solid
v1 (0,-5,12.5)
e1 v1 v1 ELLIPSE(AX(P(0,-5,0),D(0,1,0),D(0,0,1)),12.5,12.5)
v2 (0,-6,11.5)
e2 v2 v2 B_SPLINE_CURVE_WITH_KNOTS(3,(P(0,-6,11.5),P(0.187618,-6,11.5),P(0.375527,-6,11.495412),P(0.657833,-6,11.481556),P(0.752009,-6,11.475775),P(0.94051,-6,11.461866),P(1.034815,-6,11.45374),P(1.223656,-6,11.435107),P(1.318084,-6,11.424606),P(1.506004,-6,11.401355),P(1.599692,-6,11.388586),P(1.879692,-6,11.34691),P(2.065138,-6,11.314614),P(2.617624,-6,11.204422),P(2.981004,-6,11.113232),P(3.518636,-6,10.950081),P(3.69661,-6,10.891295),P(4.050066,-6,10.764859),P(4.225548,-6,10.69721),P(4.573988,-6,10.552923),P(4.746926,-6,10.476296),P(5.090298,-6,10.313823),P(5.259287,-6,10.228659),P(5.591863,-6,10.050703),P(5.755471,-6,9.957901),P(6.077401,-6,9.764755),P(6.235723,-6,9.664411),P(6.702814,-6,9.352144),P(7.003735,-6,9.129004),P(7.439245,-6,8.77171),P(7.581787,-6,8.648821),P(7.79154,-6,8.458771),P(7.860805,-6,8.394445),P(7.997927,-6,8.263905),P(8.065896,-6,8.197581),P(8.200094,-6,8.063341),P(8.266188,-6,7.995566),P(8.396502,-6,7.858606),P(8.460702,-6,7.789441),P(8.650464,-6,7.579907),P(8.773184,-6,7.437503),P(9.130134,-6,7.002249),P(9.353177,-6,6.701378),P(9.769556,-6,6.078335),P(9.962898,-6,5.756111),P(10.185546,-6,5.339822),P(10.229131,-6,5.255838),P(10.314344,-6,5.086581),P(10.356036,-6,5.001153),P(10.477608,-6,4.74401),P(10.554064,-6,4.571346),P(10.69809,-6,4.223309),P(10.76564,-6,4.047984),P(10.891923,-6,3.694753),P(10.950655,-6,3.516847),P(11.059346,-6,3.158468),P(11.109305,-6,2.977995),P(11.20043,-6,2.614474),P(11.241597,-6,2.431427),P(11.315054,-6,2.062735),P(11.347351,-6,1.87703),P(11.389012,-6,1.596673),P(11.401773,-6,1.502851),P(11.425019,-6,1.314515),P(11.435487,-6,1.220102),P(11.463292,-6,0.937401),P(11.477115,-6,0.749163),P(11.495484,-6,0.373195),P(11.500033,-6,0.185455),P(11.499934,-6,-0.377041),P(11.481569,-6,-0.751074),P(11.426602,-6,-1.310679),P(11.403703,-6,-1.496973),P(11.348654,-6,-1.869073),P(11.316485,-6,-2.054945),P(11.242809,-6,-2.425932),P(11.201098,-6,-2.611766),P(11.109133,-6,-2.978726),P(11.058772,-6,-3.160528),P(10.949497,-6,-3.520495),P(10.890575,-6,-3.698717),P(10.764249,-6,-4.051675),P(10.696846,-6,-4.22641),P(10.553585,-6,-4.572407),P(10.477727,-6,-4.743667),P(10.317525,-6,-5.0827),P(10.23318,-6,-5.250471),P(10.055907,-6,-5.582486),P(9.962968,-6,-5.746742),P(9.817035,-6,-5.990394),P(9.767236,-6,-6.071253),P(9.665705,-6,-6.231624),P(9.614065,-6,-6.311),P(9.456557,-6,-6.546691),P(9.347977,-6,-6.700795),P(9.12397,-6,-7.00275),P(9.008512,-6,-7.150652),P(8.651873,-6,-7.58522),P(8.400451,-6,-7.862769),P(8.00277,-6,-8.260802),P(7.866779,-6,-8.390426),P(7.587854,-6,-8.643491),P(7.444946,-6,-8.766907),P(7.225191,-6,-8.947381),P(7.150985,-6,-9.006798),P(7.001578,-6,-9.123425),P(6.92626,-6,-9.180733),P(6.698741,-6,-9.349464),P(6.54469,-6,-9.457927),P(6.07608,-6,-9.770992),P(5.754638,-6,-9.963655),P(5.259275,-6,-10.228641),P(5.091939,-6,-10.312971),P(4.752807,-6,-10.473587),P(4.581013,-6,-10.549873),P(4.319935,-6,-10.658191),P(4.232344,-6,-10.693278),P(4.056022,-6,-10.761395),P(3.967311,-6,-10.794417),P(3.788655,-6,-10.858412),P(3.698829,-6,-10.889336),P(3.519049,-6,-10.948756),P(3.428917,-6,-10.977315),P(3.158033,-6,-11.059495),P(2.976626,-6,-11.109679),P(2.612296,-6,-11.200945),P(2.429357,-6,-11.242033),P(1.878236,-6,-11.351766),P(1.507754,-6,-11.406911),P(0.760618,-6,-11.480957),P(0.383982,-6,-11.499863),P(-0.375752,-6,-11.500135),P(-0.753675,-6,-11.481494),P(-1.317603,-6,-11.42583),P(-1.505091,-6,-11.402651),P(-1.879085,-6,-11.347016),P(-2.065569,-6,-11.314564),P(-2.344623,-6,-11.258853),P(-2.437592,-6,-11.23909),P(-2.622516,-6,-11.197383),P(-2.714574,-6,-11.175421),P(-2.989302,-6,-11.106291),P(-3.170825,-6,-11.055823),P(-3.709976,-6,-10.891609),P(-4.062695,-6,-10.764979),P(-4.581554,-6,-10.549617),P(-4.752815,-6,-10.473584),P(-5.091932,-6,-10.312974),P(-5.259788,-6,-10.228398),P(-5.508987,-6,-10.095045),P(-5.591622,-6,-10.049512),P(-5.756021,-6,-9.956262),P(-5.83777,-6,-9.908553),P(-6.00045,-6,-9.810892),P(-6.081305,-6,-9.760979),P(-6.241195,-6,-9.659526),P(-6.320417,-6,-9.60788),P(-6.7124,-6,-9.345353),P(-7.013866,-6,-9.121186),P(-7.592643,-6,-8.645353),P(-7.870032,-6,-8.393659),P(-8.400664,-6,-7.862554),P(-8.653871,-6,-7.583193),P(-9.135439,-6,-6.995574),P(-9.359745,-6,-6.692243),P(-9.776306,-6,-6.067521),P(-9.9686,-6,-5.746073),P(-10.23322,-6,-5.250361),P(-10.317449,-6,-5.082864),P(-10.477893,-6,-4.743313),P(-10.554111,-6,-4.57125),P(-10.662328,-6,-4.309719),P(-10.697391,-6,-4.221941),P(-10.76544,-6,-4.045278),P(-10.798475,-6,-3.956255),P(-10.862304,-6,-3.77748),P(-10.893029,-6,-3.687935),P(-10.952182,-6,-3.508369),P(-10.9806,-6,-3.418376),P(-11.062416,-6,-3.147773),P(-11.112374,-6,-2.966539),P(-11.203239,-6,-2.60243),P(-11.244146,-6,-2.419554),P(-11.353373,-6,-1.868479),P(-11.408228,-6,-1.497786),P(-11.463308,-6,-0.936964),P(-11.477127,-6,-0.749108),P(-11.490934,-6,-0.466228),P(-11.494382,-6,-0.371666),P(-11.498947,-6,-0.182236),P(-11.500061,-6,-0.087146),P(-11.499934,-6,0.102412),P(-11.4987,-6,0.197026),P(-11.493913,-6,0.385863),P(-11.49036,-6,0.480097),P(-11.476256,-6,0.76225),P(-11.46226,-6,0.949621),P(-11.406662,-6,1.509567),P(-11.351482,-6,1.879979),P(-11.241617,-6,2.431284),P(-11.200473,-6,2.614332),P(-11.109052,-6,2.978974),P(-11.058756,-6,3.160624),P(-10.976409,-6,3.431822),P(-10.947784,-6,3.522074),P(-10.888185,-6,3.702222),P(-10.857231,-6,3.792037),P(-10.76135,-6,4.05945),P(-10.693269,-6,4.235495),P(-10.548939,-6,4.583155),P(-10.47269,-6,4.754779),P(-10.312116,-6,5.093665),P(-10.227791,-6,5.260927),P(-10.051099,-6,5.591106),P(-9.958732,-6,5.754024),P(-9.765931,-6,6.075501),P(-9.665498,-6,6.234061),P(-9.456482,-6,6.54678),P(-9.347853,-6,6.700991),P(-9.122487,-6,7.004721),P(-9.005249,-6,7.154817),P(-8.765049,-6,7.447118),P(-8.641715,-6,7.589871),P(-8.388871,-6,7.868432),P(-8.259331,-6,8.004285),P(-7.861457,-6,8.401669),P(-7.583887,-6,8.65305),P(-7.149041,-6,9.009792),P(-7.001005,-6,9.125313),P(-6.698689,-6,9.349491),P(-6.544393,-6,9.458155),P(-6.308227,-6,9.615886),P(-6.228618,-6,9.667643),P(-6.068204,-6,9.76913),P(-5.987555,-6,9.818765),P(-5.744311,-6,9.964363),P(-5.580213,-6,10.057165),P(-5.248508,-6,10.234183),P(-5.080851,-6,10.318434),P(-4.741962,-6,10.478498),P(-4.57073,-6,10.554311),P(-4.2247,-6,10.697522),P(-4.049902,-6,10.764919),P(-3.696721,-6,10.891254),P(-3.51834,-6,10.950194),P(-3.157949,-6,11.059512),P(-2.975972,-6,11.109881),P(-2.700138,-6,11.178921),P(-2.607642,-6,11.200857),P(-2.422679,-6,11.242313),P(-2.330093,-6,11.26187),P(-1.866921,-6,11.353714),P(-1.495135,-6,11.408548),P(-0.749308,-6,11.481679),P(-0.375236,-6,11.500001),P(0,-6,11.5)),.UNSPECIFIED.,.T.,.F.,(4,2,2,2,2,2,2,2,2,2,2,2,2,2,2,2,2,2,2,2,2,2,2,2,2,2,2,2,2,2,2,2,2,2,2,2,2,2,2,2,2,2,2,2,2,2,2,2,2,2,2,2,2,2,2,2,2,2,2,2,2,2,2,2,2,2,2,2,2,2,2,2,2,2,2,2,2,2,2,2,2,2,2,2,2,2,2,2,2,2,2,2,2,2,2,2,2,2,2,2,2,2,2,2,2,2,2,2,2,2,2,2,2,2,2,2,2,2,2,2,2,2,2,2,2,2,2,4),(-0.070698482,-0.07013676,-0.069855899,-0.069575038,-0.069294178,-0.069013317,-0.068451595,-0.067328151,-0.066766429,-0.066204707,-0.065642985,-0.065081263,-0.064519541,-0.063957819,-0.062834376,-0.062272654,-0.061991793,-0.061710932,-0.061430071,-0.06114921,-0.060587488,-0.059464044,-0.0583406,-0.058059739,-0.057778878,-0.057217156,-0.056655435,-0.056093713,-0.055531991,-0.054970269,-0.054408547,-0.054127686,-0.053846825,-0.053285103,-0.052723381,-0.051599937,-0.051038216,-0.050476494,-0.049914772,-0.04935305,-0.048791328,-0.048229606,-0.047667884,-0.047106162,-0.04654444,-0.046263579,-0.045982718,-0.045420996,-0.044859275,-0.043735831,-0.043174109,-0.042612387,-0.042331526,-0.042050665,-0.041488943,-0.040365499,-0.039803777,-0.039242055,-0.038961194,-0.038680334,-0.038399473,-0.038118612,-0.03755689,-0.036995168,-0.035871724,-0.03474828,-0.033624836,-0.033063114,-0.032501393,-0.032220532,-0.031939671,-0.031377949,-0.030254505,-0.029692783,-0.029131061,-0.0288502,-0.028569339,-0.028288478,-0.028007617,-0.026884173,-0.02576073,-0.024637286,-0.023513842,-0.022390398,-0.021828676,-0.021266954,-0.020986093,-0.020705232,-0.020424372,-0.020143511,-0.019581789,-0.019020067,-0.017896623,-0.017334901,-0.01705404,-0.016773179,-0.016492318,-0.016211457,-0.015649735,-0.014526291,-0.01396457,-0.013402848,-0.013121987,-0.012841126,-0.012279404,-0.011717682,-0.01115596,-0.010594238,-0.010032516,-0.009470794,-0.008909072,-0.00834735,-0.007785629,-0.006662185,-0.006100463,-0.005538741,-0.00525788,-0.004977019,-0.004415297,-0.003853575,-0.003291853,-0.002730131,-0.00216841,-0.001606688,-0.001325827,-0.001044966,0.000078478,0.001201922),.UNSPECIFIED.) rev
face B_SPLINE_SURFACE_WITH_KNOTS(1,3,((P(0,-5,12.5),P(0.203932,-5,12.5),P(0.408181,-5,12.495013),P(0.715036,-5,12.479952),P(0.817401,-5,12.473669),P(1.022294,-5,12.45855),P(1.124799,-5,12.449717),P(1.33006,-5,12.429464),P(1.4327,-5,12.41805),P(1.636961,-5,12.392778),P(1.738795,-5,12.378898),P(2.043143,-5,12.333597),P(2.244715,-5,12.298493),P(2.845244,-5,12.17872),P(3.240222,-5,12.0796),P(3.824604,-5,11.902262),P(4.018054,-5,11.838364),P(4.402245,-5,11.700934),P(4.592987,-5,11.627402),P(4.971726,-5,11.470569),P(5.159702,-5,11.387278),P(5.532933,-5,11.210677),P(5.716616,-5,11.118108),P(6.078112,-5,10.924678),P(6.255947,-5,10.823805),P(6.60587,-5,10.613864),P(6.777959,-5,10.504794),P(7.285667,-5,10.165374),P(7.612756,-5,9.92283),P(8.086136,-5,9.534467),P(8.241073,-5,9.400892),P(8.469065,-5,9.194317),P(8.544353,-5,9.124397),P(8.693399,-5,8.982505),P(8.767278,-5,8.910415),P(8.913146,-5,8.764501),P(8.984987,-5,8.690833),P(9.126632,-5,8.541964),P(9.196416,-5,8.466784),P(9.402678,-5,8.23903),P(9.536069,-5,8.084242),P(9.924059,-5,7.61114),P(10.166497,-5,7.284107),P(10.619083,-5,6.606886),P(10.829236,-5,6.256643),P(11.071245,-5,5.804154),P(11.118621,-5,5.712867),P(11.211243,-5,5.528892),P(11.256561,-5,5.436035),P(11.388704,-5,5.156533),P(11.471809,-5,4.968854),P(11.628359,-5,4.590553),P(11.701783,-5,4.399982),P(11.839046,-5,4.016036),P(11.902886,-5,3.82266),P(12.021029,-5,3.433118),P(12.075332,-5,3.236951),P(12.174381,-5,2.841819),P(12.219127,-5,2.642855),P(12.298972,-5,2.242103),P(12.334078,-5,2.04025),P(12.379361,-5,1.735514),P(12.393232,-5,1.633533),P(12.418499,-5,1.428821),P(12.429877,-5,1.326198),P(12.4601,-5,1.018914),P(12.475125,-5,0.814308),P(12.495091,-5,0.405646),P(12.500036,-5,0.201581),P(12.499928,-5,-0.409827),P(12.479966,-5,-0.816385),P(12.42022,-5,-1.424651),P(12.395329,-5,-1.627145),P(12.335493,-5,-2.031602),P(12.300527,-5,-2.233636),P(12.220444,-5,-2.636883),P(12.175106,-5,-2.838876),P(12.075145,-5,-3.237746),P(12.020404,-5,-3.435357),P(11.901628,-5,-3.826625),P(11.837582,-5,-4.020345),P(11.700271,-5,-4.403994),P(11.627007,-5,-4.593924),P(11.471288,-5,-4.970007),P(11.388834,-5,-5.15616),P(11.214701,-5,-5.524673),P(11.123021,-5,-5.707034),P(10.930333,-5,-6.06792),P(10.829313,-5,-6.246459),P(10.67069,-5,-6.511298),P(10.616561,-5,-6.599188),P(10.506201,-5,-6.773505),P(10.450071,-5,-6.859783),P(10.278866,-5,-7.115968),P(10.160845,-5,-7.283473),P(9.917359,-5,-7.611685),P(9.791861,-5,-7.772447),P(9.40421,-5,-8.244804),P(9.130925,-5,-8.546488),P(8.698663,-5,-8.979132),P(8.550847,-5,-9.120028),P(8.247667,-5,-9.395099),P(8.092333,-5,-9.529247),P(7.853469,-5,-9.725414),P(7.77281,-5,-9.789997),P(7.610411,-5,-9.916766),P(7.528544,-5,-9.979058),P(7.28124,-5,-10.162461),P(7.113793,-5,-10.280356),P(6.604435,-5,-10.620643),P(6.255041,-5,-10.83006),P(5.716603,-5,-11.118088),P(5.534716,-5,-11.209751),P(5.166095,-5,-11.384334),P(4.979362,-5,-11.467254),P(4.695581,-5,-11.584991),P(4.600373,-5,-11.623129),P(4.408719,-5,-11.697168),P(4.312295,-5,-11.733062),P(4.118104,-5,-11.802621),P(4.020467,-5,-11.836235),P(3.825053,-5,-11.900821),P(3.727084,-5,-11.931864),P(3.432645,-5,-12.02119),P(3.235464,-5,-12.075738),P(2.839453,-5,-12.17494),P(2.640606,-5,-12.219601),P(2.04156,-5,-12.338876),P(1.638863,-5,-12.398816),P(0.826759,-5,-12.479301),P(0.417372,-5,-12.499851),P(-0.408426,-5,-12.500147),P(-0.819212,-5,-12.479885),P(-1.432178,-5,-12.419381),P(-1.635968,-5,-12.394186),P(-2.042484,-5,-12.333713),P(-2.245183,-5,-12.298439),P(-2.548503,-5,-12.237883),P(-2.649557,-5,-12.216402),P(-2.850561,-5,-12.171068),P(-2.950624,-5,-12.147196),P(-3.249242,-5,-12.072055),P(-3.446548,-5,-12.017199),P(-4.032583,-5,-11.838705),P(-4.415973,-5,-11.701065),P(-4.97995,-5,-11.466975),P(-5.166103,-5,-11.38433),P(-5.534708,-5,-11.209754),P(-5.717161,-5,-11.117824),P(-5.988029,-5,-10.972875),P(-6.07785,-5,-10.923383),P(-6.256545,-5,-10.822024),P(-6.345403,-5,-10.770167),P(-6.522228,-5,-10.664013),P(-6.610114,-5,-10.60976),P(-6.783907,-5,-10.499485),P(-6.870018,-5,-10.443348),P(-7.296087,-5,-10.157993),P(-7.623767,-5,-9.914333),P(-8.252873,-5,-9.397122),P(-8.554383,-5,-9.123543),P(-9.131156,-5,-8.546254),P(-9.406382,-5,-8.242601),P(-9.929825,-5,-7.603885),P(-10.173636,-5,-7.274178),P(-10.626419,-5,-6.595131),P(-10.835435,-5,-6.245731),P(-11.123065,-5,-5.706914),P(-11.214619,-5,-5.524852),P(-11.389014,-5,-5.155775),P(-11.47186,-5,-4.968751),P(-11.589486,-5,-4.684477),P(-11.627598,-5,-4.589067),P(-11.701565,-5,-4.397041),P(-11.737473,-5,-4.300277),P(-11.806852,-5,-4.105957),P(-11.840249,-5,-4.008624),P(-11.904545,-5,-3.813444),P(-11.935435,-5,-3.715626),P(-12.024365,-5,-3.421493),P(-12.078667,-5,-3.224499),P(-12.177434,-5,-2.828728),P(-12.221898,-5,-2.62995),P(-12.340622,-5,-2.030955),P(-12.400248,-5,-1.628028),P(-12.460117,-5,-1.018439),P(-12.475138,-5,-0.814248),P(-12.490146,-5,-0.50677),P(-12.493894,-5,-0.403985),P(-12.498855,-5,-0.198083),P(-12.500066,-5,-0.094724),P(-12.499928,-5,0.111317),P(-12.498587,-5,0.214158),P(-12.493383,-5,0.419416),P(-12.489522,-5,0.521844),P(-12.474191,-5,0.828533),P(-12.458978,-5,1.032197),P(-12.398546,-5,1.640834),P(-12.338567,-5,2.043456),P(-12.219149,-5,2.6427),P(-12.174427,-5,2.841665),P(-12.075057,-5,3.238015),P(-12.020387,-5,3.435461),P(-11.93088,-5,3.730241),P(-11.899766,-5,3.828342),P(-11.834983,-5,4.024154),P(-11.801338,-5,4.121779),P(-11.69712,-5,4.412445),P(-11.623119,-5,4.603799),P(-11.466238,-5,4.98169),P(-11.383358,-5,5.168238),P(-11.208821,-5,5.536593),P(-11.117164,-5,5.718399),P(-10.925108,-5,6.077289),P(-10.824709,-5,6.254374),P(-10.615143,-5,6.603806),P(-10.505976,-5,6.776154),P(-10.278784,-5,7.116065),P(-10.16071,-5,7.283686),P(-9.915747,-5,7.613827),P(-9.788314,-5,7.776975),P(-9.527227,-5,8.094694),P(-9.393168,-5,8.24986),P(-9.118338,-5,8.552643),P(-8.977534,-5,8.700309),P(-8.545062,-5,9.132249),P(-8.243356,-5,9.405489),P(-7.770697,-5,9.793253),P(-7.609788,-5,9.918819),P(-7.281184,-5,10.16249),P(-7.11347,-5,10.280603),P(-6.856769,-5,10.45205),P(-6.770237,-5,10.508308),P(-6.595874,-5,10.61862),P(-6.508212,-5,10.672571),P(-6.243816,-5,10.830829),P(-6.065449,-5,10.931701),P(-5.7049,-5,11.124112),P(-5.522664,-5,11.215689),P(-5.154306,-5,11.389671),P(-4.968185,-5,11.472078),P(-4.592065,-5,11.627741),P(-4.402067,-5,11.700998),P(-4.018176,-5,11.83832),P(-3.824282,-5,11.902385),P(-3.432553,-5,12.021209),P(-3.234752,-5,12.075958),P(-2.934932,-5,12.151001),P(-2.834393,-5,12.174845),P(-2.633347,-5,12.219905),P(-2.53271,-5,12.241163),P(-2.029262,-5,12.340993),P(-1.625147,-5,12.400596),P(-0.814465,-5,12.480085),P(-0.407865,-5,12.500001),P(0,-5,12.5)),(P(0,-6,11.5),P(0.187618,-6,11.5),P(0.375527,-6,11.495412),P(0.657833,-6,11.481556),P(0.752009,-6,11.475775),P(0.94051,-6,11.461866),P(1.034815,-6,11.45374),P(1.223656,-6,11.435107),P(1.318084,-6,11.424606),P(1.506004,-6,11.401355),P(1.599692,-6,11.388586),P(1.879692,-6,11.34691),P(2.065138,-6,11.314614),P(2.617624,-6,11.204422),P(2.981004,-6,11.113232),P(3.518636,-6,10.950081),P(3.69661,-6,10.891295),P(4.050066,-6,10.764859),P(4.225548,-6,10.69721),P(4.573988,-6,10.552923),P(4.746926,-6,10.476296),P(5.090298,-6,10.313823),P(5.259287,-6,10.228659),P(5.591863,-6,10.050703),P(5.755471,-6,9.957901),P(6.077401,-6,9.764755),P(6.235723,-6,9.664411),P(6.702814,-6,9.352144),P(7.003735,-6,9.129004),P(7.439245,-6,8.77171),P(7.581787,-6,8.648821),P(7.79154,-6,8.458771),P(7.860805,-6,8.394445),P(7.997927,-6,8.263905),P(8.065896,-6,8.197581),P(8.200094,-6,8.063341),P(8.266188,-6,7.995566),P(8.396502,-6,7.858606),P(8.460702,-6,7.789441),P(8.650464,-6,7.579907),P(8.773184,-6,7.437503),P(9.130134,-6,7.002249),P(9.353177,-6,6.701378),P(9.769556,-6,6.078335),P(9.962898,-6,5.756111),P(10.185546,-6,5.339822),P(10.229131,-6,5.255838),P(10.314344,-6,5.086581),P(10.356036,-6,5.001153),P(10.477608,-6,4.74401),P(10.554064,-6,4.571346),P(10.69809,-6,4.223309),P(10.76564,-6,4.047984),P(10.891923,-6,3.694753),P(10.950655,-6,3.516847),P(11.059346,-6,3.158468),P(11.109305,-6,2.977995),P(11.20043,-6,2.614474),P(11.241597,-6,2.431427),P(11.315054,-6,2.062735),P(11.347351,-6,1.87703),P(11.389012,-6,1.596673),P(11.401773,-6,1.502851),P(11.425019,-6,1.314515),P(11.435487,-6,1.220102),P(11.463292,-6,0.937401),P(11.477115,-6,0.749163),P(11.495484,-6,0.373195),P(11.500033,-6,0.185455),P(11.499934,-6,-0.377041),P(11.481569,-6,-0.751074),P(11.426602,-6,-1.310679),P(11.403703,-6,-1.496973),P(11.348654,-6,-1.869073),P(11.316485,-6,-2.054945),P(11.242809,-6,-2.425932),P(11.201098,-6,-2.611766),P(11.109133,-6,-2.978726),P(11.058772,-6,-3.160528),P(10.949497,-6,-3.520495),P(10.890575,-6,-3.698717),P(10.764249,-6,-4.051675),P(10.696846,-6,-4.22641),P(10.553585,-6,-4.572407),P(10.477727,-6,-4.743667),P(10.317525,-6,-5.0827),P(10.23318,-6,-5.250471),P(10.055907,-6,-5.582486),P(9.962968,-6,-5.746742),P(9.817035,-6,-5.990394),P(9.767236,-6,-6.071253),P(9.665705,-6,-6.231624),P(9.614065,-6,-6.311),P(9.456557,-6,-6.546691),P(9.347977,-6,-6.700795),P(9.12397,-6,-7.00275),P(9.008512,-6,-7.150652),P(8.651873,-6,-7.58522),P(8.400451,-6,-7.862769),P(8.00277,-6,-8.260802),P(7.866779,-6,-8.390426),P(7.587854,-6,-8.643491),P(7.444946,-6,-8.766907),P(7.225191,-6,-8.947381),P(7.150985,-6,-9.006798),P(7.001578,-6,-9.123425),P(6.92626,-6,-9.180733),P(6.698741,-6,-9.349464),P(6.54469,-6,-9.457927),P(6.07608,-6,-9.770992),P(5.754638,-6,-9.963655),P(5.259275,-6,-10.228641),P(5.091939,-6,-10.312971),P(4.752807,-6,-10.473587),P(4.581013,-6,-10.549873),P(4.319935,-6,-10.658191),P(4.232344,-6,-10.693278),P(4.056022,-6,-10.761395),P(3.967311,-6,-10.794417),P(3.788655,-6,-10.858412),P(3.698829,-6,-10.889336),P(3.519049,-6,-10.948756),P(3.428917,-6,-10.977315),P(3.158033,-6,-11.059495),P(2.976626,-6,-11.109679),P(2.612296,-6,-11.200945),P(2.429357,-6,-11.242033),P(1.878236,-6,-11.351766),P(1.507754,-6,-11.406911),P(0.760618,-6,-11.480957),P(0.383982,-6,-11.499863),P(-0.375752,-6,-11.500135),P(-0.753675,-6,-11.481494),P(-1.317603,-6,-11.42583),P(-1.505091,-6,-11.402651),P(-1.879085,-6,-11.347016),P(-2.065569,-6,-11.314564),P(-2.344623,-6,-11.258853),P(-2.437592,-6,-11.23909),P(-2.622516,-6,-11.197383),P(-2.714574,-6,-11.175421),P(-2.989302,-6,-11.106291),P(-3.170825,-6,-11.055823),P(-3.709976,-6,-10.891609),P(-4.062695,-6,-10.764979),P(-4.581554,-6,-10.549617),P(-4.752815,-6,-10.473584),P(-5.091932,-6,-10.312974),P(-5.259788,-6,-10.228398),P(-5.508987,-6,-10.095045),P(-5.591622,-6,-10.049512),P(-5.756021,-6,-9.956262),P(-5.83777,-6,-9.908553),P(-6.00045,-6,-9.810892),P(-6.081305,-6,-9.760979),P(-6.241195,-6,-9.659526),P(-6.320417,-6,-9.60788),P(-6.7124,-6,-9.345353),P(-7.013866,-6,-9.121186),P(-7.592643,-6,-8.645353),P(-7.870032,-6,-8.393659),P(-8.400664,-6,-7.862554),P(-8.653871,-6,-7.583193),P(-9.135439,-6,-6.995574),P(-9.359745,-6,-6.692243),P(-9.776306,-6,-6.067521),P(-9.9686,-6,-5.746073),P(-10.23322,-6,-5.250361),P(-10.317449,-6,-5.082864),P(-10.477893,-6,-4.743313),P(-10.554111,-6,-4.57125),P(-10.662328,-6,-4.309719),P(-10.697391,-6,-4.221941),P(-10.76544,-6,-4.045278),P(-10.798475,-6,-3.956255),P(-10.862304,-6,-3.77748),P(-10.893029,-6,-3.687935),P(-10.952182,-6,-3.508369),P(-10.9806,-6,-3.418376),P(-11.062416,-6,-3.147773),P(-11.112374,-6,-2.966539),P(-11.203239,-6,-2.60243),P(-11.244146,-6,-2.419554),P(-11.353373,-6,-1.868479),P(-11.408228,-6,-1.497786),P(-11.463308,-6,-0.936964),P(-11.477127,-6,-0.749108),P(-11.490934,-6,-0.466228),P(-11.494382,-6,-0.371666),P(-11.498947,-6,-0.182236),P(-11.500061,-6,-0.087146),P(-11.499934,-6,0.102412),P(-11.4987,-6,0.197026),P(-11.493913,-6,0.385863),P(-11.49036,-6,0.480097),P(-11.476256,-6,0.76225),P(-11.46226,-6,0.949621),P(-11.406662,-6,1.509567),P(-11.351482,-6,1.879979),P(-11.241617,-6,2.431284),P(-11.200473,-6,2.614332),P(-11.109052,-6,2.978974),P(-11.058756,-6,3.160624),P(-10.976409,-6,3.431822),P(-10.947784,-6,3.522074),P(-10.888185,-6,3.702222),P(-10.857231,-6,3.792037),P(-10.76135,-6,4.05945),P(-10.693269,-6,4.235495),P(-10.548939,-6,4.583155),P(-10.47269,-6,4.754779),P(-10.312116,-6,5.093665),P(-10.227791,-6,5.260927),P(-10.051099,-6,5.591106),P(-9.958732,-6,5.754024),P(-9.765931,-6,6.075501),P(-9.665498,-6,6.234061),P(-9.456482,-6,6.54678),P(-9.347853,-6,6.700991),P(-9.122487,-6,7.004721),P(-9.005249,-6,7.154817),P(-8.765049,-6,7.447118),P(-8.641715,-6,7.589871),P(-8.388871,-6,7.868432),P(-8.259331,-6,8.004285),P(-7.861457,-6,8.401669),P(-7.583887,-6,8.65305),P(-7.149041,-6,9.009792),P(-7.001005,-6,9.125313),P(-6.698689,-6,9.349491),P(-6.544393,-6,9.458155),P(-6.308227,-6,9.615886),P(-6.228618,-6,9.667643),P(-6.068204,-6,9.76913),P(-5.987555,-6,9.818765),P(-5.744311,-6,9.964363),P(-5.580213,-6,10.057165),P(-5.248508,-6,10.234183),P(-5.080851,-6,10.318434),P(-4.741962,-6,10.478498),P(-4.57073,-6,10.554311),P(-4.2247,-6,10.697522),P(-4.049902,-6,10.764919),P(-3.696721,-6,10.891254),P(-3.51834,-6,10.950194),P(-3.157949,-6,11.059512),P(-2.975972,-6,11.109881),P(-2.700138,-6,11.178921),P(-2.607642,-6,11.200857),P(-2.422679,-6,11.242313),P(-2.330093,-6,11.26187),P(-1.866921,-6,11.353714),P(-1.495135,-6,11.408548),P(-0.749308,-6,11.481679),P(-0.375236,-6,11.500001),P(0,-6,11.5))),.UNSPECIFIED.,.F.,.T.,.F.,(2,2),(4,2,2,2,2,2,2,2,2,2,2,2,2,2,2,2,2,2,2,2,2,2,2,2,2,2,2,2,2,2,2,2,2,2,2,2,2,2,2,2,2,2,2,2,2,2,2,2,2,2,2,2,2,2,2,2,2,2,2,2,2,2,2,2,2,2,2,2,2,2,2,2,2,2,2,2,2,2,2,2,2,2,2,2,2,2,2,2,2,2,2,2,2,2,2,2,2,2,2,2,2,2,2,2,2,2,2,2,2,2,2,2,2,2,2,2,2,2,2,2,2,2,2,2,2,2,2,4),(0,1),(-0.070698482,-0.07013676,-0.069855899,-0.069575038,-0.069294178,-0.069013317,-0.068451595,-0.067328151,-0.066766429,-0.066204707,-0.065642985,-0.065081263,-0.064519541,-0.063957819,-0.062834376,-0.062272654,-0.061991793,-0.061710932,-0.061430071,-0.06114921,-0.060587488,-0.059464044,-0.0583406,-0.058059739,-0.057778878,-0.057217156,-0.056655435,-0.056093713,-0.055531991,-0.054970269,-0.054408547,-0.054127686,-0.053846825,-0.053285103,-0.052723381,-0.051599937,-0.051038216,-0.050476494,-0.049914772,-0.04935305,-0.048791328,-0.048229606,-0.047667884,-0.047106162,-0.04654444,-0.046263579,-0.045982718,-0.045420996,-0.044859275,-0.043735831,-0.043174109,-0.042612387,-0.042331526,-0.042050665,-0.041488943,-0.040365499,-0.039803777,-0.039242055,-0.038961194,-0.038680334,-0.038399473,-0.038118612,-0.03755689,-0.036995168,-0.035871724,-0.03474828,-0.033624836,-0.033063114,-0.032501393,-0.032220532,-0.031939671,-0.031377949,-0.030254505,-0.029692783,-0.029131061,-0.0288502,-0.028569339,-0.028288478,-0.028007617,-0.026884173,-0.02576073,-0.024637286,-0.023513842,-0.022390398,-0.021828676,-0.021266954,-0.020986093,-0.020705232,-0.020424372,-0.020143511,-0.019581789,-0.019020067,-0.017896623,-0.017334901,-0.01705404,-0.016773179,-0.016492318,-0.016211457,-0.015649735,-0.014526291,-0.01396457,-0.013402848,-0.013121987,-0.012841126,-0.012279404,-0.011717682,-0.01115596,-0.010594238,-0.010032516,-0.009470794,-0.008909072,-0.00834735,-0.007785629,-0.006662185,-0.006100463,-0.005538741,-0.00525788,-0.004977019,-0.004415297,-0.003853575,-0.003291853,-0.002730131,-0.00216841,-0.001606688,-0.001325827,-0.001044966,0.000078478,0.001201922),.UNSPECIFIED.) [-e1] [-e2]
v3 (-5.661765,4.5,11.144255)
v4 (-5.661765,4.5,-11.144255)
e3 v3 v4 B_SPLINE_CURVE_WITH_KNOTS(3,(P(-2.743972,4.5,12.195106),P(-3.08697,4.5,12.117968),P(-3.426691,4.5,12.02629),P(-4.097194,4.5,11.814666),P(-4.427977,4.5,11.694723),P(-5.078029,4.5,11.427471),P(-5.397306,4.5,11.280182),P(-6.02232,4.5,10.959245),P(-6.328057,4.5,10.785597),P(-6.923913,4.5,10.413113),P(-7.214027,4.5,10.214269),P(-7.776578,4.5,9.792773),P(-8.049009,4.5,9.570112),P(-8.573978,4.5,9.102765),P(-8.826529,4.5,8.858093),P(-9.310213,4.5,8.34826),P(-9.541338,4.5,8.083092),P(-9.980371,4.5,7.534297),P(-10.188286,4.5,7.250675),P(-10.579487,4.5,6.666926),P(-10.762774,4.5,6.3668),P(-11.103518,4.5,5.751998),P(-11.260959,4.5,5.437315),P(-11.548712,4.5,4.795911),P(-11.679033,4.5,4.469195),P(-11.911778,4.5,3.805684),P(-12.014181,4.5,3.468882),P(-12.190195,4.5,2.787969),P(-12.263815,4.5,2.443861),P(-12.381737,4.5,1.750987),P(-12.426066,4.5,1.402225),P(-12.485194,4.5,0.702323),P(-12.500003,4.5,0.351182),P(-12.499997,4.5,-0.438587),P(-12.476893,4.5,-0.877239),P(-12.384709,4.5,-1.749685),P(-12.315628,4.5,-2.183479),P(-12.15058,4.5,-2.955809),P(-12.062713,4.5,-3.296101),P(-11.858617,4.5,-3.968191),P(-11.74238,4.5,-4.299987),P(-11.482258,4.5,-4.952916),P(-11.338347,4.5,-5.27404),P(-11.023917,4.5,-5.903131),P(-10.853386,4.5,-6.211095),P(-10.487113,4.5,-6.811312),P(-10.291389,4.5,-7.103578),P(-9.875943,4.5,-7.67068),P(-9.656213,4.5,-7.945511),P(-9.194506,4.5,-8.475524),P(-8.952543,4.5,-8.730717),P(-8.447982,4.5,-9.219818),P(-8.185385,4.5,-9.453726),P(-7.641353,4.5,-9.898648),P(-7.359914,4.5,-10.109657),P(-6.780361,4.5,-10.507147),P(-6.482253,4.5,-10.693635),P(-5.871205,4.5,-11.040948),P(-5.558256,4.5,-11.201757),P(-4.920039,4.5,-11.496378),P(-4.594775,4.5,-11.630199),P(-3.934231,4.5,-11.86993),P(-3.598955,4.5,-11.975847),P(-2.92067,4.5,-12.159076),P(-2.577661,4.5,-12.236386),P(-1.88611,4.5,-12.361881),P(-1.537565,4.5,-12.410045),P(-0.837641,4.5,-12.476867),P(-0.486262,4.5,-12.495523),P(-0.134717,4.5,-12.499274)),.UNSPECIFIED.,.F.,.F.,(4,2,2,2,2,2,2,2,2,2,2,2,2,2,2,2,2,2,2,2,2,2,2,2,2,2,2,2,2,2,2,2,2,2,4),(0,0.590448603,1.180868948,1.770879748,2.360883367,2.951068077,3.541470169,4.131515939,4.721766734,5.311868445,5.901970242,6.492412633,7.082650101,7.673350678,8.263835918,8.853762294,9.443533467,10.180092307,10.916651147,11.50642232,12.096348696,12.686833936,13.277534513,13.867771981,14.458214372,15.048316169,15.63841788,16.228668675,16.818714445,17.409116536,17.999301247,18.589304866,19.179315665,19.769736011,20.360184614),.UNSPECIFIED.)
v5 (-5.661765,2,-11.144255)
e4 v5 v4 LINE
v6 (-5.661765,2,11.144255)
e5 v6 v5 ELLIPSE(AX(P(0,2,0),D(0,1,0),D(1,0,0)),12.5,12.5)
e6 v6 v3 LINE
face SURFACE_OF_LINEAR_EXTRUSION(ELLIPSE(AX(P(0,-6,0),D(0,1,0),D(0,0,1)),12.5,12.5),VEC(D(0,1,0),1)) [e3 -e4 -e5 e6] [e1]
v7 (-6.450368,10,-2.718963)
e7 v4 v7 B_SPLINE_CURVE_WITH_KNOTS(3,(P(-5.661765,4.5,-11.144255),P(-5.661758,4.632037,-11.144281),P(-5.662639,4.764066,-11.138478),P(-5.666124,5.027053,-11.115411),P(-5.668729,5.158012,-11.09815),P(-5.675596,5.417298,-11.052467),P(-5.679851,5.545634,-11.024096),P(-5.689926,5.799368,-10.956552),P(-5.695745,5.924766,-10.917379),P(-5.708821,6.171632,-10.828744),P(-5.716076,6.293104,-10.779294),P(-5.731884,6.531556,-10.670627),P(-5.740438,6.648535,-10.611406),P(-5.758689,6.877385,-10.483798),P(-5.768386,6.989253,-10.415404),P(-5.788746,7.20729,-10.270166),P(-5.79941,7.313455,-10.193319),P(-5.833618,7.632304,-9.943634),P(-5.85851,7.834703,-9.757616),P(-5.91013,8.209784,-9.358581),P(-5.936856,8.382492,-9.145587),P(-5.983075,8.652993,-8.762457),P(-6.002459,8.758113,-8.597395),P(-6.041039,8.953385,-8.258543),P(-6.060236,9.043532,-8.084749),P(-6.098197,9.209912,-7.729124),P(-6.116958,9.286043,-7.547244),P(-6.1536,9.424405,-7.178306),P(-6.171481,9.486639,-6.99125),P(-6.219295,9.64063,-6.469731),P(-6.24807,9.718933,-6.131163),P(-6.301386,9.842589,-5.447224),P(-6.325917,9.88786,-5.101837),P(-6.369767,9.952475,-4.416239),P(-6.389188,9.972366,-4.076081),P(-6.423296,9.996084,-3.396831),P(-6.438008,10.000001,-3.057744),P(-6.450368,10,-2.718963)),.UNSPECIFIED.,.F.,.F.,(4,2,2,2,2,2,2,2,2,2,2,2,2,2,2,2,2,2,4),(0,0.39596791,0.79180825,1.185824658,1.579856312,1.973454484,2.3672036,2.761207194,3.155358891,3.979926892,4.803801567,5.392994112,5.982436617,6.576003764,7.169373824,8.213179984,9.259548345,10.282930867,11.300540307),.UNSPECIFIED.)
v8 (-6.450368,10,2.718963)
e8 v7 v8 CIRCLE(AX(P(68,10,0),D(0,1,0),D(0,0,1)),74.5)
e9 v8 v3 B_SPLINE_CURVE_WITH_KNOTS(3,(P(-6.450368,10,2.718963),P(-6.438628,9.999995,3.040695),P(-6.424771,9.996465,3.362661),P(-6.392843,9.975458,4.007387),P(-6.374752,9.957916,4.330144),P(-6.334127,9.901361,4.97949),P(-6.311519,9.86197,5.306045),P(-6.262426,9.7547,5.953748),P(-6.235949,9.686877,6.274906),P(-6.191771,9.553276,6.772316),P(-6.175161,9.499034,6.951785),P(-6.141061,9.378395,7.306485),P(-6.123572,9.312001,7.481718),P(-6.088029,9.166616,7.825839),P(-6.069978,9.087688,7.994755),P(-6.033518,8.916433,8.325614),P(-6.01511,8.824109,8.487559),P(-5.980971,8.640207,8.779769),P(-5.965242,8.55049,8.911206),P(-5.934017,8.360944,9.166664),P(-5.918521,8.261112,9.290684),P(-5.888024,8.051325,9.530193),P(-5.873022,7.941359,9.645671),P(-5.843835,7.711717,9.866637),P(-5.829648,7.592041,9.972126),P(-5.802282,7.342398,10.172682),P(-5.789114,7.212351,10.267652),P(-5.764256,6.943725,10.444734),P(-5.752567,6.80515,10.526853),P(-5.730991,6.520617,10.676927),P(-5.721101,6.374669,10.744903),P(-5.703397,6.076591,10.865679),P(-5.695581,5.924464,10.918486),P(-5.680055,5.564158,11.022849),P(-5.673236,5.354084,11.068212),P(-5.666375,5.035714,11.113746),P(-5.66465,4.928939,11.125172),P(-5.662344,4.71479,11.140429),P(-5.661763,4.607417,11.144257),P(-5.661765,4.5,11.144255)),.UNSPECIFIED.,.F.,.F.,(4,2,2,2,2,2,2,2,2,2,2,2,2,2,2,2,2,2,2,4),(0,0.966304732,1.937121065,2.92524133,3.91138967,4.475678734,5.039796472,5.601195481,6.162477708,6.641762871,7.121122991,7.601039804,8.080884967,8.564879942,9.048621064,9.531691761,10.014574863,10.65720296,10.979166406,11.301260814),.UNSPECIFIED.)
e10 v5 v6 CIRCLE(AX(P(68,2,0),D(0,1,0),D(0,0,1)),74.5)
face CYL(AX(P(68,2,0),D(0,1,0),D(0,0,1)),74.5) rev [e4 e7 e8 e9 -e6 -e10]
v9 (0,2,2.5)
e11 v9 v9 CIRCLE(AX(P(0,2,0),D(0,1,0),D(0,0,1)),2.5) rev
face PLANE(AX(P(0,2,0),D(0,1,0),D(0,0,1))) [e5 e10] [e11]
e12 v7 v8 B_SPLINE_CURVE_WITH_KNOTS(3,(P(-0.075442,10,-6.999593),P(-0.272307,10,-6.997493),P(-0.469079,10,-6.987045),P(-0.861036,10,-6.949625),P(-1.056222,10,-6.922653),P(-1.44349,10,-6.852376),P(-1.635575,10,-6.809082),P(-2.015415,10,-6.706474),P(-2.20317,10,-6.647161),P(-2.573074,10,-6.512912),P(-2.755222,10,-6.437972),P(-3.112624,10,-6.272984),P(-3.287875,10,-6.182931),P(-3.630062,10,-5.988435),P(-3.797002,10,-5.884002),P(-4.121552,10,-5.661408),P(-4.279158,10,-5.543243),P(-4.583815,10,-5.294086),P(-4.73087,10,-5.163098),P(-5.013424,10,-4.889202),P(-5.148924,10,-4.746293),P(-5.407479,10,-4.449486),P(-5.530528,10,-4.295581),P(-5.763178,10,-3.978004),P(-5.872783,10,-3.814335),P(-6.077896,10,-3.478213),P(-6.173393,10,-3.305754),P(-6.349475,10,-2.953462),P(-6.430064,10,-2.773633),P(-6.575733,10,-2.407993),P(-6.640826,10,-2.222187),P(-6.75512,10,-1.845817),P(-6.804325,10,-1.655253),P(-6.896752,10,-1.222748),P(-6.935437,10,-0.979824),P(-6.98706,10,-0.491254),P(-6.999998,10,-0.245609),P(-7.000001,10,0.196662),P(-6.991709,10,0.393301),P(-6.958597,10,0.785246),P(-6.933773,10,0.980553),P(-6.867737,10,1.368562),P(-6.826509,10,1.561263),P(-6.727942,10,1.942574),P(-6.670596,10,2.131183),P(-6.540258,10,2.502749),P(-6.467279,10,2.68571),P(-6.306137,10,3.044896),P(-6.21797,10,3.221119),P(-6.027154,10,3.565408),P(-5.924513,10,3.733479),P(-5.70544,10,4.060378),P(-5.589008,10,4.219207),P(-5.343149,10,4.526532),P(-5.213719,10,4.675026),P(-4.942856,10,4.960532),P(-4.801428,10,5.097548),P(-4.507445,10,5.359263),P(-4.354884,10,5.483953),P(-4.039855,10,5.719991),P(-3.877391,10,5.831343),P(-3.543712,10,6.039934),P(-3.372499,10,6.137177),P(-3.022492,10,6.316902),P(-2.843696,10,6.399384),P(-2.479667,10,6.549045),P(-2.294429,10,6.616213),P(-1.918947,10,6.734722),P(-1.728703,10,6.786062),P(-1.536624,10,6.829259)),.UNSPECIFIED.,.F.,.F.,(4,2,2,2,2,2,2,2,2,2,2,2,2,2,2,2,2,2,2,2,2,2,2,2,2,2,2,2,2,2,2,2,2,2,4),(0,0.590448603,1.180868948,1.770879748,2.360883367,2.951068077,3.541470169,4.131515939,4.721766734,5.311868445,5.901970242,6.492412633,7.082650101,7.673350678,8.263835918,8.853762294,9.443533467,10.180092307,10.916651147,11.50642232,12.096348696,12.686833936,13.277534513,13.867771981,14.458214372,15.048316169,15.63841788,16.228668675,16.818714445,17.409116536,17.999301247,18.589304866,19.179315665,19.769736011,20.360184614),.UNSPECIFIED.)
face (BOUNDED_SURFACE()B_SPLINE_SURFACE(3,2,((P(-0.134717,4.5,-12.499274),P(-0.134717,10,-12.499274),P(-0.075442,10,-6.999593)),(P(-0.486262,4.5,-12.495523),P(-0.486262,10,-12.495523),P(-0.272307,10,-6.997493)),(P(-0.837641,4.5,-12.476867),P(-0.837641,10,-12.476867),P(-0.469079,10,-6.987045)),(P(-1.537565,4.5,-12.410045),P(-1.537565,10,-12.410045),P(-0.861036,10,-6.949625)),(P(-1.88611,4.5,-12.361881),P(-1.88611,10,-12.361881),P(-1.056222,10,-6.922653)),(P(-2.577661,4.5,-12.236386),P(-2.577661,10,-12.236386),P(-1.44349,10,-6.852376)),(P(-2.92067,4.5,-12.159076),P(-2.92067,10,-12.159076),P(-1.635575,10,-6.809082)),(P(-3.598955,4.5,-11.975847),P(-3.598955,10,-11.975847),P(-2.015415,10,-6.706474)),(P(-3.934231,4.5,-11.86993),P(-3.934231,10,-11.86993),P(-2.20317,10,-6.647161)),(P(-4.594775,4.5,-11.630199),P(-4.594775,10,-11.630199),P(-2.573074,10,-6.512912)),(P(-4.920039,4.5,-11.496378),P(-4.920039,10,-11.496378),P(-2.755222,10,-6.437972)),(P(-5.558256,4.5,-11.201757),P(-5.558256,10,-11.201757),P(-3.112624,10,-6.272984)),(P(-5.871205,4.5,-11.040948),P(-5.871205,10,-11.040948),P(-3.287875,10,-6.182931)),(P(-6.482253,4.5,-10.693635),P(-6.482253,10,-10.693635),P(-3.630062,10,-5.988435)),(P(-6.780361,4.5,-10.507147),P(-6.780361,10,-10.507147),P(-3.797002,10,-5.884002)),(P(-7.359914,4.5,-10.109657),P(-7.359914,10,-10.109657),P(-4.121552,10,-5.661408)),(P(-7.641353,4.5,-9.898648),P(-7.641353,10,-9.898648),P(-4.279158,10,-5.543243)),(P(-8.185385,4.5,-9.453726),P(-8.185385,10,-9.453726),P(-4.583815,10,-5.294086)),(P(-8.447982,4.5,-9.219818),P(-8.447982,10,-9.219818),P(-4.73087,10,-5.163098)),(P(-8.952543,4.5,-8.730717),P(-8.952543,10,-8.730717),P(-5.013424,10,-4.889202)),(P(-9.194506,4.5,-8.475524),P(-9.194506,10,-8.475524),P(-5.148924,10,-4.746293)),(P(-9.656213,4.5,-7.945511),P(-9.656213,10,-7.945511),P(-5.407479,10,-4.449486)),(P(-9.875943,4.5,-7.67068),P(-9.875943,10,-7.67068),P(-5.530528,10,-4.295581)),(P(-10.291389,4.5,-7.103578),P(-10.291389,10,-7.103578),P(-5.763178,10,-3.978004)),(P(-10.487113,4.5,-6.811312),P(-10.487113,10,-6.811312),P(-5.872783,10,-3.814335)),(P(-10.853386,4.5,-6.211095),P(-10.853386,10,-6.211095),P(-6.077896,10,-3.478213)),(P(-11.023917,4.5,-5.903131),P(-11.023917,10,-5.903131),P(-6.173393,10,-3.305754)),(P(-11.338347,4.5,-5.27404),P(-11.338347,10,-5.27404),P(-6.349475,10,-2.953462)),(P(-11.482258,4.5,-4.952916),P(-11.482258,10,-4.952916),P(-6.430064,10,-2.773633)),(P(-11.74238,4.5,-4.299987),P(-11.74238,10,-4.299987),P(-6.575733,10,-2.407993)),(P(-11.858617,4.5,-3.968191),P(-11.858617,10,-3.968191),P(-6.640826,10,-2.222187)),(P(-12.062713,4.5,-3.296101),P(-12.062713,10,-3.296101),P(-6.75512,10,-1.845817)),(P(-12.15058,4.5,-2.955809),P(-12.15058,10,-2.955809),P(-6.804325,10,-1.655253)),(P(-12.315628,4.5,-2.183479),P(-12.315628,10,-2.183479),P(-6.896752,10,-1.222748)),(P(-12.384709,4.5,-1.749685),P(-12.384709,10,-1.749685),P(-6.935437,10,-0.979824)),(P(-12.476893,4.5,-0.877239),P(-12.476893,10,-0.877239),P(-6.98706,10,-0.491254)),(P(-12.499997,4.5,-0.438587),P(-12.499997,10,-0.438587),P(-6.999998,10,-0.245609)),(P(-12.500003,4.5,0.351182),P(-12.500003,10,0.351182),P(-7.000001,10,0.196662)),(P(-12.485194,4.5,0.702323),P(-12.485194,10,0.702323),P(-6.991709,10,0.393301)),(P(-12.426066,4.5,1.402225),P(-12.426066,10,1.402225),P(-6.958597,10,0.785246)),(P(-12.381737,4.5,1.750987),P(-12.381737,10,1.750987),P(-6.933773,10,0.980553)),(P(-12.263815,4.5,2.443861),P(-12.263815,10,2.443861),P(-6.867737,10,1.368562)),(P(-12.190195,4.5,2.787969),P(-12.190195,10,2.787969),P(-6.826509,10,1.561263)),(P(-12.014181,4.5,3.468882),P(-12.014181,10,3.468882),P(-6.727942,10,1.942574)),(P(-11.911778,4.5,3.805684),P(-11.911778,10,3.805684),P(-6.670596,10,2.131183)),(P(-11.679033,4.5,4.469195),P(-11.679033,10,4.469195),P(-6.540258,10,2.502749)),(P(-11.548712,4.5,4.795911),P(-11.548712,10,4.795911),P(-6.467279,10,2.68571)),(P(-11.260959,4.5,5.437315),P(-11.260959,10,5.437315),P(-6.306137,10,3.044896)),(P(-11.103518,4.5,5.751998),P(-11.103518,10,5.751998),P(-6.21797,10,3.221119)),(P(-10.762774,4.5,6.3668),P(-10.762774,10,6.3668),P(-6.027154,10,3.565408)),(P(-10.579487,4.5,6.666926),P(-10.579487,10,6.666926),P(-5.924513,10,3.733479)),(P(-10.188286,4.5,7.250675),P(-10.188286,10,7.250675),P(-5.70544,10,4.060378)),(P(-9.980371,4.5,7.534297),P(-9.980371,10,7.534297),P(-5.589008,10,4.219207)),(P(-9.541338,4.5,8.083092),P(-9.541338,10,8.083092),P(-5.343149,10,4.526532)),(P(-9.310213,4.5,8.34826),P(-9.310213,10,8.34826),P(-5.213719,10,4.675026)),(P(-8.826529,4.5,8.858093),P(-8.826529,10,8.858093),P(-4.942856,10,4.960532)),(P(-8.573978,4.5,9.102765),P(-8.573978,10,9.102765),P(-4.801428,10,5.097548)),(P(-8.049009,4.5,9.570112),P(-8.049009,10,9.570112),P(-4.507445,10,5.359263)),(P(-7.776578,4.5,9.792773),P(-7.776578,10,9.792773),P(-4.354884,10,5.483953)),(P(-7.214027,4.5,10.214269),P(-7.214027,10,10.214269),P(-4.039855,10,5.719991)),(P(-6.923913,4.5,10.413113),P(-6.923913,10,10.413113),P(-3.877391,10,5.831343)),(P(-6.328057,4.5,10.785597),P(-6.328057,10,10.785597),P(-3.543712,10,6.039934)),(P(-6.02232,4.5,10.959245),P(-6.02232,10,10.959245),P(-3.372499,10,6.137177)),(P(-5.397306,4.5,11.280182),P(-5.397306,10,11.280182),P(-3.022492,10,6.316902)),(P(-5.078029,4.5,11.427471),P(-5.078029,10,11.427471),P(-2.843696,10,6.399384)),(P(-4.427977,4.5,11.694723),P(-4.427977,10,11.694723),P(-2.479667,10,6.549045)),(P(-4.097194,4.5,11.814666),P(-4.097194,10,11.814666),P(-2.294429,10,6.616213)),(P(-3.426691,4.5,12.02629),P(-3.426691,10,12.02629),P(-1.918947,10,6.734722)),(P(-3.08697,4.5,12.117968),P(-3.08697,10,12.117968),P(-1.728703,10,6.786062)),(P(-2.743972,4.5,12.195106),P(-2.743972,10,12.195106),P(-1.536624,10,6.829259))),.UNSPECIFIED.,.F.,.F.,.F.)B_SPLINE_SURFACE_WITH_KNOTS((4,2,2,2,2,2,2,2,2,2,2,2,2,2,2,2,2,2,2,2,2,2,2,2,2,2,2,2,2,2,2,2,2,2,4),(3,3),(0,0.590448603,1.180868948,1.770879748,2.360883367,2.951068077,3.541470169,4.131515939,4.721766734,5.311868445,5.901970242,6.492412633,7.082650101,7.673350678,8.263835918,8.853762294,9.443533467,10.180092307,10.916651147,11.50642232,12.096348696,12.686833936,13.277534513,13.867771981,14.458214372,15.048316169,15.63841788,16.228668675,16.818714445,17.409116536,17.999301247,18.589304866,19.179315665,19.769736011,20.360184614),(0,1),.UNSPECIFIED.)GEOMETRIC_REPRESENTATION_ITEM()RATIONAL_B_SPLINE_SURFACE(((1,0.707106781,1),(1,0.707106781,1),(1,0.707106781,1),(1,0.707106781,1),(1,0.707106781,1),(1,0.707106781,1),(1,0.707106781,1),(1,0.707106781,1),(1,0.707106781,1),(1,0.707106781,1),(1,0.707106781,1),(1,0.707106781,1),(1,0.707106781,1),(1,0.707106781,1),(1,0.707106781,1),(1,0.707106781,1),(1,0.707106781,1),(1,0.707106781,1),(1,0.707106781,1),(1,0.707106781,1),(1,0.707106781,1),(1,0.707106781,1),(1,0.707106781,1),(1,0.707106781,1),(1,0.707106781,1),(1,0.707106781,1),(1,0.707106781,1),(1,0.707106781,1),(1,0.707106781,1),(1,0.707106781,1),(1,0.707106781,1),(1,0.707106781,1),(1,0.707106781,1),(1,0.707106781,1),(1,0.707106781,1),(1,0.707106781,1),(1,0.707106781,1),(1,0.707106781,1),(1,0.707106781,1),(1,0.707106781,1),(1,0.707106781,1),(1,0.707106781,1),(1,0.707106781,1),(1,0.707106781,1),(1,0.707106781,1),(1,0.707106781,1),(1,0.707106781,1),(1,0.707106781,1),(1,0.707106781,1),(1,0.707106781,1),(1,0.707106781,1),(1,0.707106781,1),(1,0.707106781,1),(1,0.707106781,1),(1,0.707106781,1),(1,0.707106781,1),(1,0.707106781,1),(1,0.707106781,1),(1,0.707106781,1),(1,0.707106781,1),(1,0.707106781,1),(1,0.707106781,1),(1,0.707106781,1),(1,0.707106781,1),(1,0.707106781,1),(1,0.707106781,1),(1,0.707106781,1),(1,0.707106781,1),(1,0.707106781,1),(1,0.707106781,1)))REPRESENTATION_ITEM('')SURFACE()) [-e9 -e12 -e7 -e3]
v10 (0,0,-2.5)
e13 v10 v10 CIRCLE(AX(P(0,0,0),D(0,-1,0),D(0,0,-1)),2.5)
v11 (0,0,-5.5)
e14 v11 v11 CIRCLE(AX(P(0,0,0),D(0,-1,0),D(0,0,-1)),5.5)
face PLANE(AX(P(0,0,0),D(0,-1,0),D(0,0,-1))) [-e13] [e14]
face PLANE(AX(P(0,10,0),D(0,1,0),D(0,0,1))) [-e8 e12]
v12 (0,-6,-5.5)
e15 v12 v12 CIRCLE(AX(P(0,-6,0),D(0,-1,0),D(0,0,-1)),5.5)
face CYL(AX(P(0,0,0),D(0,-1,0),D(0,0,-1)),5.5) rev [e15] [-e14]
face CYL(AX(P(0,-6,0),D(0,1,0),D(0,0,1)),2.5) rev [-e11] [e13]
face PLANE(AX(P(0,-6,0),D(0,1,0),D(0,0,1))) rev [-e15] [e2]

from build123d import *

# Parameters (mm, degrees)
BOSS_EXTRUDE1_DEPTH      = 10
BOSS_EXTRUDE1_DEPTH_BACK = 6
SKETCH1_RX               = 12.5
SKETCH1_RY               = 12.5
SKETCH1_R                = 2.5
CUT_EXTRUDE1_START       = -8
CUT_EXTRUDE1_OUTLINE_R   = 2.5
CUT_EXTRUDE1_DEPTH       = 8
FILLET1_R                = 5.5
SKETCH3_R                = 5.5
SKETCH3_R_2              = 2.5
CUT_EXTRUDE2_DEPTH       = 6
CHAMFER1_SIZE            = 1


# Read off the part's stored shape, not the designer's step: Cut-Extrude1
with BuildPart() as part:
    # Sketch1 → Boss-Extrude1 (new, two sides: drawn at the far end of the back side and taken through both)
    with BuildSketch(Plane(origin=(0, 0, 0), x_dir=(1, 0, 0), z_dir=(0, 1, 0)).offset(-BOSS_EXTRUDE1_DEPTH_BACK)):
        with Locations(Location((0, 0), (0, 0, -180))):
            Ellipse(SKETCH1_RX, SKETCH1_RY)
        with Locations(Location((0, 0, 0), (0, 0, 270))):
            Circle(SKETCH1_R, mode=Mode.SUBTRACT)
    extrude(amount=BOSS_EXTRUDE1_DEPTH + BOSS_EXTRUDE1_DEPTH_BACK)

    # Cut-Extrude1 outline → Cut-Extrude1 (cut)
    with BuildSketch(Plane(origin=(0, 10, 0), x_dir=(1, 0, 0), z_dir=(0, 1, 0)).offset(CUT_EXTRUDE1_START)):
        with BuildLine():
            add(Edge.make_bspline(
                [(-5.661764706, -11.144255041), (-4.512657491, -11.728051324), (-3.332619083, -12.141253277), (-2.167018805, -12.389388515), (-1.051861299, -12.5), (4.330127019, -12.5), (10.825317547, -10.416666667), (14.43375673, -4.166666667), (12.990381057, 2.5), (9.293805319, 8.902656992), (6.609319122, 11.644393421), (2.468408622, 13.548505079), (-2.218139666, 12.893765855), (-5.661764706, 11.144255041)],
                knots=[5.774421212, 5.774421212, 5.774421212, 5.774421212, 5.774421212, 5.774421212, 6.283185307, 6.283185307, 6.283185307, 6.283185307, 8.37758041, 8.37758041, 8.37758041, 8.37758041, 9.859103559, 9.859103559, 9.859103559, 9.859103559, 9.859103559, 9.859103559], degree=5, weights=[1, 1, 1.000149309, 1.000268817, 1, 1, 0.9, 0.9, 1, 1, 0.983486663, 0.969415241, 1, 1]))
            ThreePointArc((-5.661764706, 11.144255041), (-6.5, 0), (-5.661764706, -11.144255041))
        make_face()
        Circle(CUT_EXTRUDE1_OUTLINE_R, mode=Mode.SUBTRACT)
    extrude(amount=CUT_EXTRUDE1_DEPTH, mode=Mode.SUBTRACT)

    # Fillet1
    fillet1_edges = [part.edges().sort_by_distance(p)[0] for p in [
        (-10.6541555, 10, 6.537504921),
    ]]
    fillet(fillet1_edges, radius=FILLET1_R)

    # Sketch3 → Cut-Extrude2 (cut)
    with BuildSketch(Plane.XZ.offset(6)):
        with Locations(Location((0, 0, 0), (0, 0, 270))):
            Circle(SKETCH3_R)
        with Locations(Location((0, 0, 0), (0, 0, 90))):
            Circle(SKETCH3_R_2, mode=Mode.SUBTRACT)
    extrude(amount=-CUT_EXTRUDE2_DEPTH, mode=Mode.SUBTRACT)

    # Chamfer1
    chamfer1_edges = [part.edges().sort_by_distance(p)[0] for p in [
        (12.5, -6, 0),
    ]]
    chamfer(chamfer1_edges, length=CHAMFER1_SIZE)


solid = part.part
